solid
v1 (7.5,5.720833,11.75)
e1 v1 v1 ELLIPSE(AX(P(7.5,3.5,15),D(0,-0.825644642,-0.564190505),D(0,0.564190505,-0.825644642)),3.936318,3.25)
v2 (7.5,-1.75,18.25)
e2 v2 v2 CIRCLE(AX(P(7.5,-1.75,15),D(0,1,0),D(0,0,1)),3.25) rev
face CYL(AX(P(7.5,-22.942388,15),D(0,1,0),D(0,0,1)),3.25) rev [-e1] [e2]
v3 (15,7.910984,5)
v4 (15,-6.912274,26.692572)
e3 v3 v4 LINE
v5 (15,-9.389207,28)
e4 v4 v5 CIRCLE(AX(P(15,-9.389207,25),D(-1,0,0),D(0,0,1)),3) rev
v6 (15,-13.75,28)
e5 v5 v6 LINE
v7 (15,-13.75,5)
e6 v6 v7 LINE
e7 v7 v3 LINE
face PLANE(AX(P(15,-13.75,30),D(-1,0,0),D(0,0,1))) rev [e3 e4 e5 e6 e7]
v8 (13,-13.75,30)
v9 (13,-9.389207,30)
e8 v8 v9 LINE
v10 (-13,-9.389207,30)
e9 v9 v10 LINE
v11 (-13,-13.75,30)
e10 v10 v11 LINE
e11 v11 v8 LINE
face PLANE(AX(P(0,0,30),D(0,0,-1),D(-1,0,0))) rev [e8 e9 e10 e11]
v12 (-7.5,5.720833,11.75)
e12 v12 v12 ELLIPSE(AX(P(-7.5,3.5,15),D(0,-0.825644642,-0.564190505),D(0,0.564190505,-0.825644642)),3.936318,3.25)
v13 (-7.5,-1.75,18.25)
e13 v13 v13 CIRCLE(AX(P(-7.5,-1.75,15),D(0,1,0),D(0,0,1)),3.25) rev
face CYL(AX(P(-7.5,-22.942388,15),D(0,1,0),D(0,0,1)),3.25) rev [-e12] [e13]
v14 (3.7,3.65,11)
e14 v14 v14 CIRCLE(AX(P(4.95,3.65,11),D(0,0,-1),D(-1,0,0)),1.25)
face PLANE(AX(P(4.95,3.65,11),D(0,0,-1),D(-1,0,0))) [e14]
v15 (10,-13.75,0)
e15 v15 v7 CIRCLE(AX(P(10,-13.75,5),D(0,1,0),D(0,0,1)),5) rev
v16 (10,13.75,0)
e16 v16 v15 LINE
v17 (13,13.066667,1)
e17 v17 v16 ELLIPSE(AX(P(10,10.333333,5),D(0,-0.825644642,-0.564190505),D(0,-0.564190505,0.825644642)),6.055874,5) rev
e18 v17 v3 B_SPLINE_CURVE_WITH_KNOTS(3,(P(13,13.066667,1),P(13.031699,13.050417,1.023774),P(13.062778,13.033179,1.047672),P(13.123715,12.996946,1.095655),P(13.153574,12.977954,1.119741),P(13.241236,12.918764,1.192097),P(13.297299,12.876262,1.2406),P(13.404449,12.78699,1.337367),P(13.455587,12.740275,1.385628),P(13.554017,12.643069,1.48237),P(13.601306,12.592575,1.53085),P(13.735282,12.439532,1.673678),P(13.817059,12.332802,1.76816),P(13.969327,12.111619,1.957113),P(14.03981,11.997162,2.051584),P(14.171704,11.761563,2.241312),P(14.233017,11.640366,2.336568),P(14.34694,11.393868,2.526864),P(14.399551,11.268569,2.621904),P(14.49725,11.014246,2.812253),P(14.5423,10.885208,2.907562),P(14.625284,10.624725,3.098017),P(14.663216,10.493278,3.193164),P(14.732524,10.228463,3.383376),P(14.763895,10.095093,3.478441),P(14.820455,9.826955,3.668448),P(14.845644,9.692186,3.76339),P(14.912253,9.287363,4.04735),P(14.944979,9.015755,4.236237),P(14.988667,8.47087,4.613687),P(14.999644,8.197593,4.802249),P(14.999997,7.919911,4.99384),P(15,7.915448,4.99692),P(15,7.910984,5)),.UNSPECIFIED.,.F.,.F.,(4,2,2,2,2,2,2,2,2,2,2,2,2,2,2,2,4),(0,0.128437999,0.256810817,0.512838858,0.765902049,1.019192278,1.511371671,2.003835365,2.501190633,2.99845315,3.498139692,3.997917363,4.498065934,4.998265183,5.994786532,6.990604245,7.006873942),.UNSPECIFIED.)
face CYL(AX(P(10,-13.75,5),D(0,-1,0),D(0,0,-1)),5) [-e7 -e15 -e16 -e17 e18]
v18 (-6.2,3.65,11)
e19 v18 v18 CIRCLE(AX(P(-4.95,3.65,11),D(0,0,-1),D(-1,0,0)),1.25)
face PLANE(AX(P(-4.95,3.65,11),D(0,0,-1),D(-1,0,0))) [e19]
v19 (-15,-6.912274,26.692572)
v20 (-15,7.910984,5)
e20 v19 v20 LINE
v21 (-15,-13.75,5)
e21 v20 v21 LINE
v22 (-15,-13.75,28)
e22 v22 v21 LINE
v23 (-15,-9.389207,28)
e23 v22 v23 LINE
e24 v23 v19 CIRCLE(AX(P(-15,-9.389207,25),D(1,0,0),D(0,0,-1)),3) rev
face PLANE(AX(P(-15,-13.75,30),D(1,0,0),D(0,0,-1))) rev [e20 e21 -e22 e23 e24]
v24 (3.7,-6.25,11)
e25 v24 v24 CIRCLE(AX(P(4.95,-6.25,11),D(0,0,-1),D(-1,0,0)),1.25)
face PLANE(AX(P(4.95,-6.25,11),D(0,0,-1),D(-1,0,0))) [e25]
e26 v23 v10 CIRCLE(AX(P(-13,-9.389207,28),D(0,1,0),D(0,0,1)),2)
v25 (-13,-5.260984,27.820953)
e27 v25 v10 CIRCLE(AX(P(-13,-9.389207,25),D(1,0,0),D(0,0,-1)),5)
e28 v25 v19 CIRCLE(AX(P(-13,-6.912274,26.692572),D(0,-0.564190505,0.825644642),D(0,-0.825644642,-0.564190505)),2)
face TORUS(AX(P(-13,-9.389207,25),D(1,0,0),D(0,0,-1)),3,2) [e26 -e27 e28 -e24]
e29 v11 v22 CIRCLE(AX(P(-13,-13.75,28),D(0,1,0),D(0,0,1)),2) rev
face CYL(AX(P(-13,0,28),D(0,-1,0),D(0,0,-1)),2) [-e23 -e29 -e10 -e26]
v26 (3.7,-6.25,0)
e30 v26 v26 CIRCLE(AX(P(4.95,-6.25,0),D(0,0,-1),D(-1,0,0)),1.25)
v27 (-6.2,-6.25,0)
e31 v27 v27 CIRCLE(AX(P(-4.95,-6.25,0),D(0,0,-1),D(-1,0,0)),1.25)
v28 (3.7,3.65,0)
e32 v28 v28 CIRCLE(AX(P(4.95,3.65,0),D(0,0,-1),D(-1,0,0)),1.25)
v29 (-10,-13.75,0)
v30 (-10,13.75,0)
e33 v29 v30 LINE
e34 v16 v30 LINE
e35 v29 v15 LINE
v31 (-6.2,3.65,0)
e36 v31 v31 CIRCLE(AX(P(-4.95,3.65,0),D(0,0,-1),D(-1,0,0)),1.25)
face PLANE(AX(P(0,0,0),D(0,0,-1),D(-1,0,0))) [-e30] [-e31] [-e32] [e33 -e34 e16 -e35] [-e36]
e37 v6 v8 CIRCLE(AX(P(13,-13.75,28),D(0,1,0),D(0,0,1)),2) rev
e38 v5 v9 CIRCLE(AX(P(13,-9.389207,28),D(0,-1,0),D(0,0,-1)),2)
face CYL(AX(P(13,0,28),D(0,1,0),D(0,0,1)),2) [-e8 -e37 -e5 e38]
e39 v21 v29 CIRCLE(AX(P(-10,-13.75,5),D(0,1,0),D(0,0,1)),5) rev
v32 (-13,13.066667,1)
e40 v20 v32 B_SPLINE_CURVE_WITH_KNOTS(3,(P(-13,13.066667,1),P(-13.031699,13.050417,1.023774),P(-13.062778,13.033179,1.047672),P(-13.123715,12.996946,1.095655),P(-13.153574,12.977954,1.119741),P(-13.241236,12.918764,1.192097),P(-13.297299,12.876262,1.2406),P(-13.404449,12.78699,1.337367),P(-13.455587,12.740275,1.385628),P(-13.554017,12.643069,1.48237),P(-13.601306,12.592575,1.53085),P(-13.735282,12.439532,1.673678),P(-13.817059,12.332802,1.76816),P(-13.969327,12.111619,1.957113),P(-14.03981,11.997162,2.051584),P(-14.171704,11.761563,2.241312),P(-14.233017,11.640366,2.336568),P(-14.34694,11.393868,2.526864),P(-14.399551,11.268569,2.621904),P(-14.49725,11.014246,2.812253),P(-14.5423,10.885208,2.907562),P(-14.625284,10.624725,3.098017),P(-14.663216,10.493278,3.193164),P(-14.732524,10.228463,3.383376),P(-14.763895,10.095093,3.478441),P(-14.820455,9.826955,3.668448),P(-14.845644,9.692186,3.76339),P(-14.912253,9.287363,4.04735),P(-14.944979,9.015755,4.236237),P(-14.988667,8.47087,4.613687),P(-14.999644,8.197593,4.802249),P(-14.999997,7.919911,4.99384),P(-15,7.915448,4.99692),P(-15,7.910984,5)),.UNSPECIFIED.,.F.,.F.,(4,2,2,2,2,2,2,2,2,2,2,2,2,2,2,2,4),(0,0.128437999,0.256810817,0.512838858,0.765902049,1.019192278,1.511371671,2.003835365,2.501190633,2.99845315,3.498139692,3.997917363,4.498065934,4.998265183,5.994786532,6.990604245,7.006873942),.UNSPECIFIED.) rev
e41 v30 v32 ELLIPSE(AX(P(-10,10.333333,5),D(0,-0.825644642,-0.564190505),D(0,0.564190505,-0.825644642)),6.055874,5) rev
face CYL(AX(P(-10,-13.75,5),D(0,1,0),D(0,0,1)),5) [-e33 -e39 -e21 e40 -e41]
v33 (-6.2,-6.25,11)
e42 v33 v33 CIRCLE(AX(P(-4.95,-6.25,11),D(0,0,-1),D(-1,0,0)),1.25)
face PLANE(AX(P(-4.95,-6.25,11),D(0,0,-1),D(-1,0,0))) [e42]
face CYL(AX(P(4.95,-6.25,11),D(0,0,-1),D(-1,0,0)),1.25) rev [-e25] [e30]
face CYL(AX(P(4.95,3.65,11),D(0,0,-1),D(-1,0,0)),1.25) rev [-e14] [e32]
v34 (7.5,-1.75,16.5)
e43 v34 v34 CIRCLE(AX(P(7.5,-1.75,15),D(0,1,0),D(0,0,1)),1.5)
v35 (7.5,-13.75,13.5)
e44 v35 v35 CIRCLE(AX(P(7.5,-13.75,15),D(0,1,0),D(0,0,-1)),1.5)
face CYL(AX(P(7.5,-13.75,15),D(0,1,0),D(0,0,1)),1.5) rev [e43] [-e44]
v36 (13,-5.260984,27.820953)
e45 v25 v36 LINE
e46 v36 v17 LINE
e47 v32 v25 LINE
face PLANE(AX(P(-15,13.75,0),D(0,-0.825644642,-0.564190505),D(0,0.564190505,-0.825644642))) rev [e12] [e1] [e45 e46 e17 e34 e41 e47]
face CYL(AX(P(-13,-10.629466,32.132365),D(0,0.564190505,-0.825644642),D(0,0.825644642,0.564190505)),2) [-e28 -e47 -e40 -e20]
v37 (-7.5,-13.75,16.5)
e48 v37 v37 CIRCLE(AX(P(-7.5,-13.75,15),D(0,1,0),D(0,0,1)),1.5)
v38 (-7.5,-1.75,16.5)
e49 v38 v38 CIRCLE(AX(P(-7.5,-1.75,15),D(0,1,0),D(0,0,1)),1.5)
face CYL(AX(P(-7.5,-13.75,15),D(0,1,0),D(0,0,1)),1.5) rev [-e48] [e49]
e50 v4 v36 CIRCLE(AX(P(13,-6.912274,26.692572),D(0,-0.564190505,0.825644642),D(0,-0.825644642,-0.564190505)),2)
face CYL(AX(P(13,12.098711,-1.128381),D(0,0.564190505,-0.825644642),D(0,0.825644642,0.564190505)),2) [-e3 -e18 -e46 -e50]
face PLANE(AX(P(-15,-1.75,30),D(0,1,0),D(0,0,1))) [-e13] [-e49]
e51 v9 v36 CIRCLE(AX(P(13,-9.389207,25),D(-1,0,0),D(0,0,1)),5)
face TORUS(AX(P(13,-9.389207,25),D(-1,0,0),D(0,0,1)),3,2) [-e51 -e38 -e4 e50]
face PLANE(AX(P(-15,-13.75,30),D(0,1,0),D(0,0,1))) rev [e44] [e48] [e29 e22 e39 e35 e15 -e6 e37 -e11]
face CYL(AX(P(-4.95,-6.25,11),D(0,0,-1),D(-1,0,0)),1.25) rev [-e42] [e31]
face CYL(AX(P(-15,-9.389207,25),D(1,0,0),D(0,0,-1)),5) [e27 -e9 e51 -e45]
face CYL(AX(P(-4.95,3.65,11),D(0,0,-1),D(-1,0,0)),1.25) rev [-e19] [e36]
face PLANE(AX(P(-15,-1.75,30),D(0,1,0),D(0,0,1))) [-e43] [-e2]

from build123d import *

# Parameters (mm, degrees)
SKETCH1_W              = 30
SKETCH1_H              = 27.5
EXTRUDE1_DEPTH         = 30
EXTRUDE3_DEPTH         = 45.598906937
SKETCH7_R              = 1.25
CUT_EXTRUDE_1045_DEPTH = 11
SKETCH8_R              = 3.25
EXTRUDE8_DEPTH         = 15.5
EXTRUDE9_DEPTH         = 44.373378932
EXTRUDE9_DEPTH_BACK    = 44.373378932
SKETCH9_R              = 1.5
FILLET1_R              = 5
FILLET3_R              = 2


with BuildPart() as part:
    # Sketch1 → Extrude1 (new body)
    with BuildSketch(Plane.XY):
        Rectangle(SKETCH1_W, SKETCH1_H)
    extrude(amount=EXTRUDE1_DEPTH)

    # Sketch3 → Extrude3 (cut, through all)
    with BuildSketch(Plane(origin=(15, 0, 0), x_dir=(0, 0, -1), z_dir=(1, 0, 0))):
        Polygon((-30, -6.75), (-30, 13.75), (0, 13.75), align=None)
    extrude(amount=-EXTRUDE3_DEPTH, mode=Mode.SUBTRACT)

    # Sketch7 → Cut-Extrude 1045 (cut)
    with BuildSketch(Plane(origin=(0, 0, 0), x_dir=(-1, 0, 0), z_dir=(0, 0, -1))):
        with Locations((-4.95, 3.65)):
            Circle(SKETCH7_R)
        with Locations((4.95, 3.65)):
            Circle(SKETCH7_R)
        with Locations((4.95, -6.25)):
            Circle(SKETCH7_R)
        with Locations((-4.95, -6.25)):
            Circle(SKETCH7_R)
    extrude(amount=-CUT_EXTRUDE_1045_DEPTH, mode=Mode.SUBTRACT)

    # Sketch8 → Extrude8 (cut)
    with BuildSketch(Plane(origin=(0, 13.75, 0), x_dir=(1, 0, 0), z_dir=(0, 1, 0))):
        with Locations(Location((-7.5, -15, 0), (0, 0, 270))):
            Circle(SKETCH8_R)
        with Locations(Location((7.5, -15, 0), (0, 0, 270))):
            Circle(SKETCH8_R)
    extrude(amount=-EXTRUDE8_DEPTH, mode=Mode.SUBTRACT)

    # Sketch9 → Extrude9 (cut, two sides: drawn at the far end of the back side and taken through both)
    with BuildSketch(Plane(origin=(0, 13.75, 0), x_dir=(1, 0, 0), z_dir=(0, 1, 0)).offset(-EXTRUDE9_DEPTH_BACK)):
        with Locations(Location((-7.5, -15, 0), (0, 0, 270))):
            Circle(SKETCH9_R)
        with Locations(Location((7.5, -15, 0), (0, 0, 270))):
            Circle(SKETCH9_R)
    extrude(amount=EXTRUDE9_DEPTH + EXTRUDE9_DEPTH_BACK, mode=Mode.SUBTRACT)

    # Fillet1
    fillet1_edges = [part.edges().sort_by_distance(p)[0] for p in [
        (0, -6.75, 30),
        (15, 0, 0),
        (-15, 0, 0),
    ]]
    fillet(fillet1_edges, radius=FILLET1_R)

    # Fillet3
    # the kernel refuses this fillet: 2 mm, written as the material it takes off along each edge
    with BuildSketch(Plane(origin=(15, -18.75, 30), x_dir=(-1, 0, 0), z_dir=(0, 1, 0))) as fillet3_piece_1:
        with BuildLine():
            CenterArc((FILLET3_R, -FILLET3_R), FILLET3_R, 90, 90)
            Line((0, -FILLET3_R), (0, 0))
            Line((0, 0), (FILLET3_R, 0))
        make_face()
    extrude(amount=9.360792567, mode=Mode.SUBTRACT)
    with BuildSketch(Plane(origin=(-15, -9.389207433, 30), x_dir=(0, 0, -1), z_dir=(0, -1, 0))) as fillet3_piece_2:
        with BuildLine():
            CenterArc((FILLET3_R, FILLET3_R), FILLET3_R, 180, 90)
            Line((0, FILLET3_R), (0, 0))
            Line((0, 0), (FILLET3_R, 0))
        make_face()
    extrude(amount=9.360792567, mode=Mode.SUBTRACT)
    with BuildSketch(Plane(origin=(-15, 13.154285858, 0.871776792), x_dir=(0, -0.8256446415008141, -0.5641905050255563), z_dir=(0, -0.5641905050255562, 0.8256446415008141))) as fillet3_piece_3:
        with BuildLine():
            CenterArc((FILLET3_R, FILLET3_R), FILLET3_R, 180, 90)
            Line((0, FILLET3_R), (0, 0))
            Line((0, 0), (FILLET3_R, 0))
        make_face()
    extrude(amount=32.640163065, mode=Mode.SUBTRACT)
    with BuildSketch(Plane(origin=(15, 13.154285858, 0.871776792), x_dir=(0, -0.8256446415008141, -0.5641905050255563), z_dir=(0, -0.5641905050255562, 0.8256446415008141))) as fillet3_piece_4:
        with BuildLine():
            CenterArc((FILLET3_R, -FILLET3_R), FILLET3_R, 90, 90)
            Line((0, -FILLET3_R), (0, 0))
            Line((0, 0), (FILLET3_R, 0))
        make_face()
    extrude(amount=32.640163065, mode=Mode.SUBTRACT)
    with BuildSketch(Plane(origin=(15, -9.389207433, 25), x_dir=(0, 0, 1), z_dir=(0, -1, 0))) as fillet3_piece_5:
        with BuildLine():
            CenterArc((5 - FILLET3_R, FILLET3_R), FILLET3_R, 270, 90)
            Line((5, FILLET3_R), (5, 0))
            Line((5, 0), (5 - FILLET3_R, 0))
        make_face()
    revolve(axis=Axis((15, -9.389207433, 25), (-1, 0, 0)), revolution_arc=55.6539026, mode=Mode.SUBTRACT)
    with BuildSketch(Plane(origin=(-15, -9.389207433, 25), x_dir=(0, 0, 1), z_dir=(0, -1, 0))) as fillet3_piece_6:
        with BuildLine():
            CenterArc((5 - FILLET3_R, -FILLET3_R), FILLET3_R, 0, 90)
            Line((5, -FILLET3_R), (5, 0))
            Line((5, 0), (5 - FILLET3_R, 0))
        make_face()
    revolve(axis=Axis((-15, -9.389207433, 25), (-1, 0, 0)), revolution_arc=55.6539026, mode=Mode.SUBTRACT)


solid = part.part
